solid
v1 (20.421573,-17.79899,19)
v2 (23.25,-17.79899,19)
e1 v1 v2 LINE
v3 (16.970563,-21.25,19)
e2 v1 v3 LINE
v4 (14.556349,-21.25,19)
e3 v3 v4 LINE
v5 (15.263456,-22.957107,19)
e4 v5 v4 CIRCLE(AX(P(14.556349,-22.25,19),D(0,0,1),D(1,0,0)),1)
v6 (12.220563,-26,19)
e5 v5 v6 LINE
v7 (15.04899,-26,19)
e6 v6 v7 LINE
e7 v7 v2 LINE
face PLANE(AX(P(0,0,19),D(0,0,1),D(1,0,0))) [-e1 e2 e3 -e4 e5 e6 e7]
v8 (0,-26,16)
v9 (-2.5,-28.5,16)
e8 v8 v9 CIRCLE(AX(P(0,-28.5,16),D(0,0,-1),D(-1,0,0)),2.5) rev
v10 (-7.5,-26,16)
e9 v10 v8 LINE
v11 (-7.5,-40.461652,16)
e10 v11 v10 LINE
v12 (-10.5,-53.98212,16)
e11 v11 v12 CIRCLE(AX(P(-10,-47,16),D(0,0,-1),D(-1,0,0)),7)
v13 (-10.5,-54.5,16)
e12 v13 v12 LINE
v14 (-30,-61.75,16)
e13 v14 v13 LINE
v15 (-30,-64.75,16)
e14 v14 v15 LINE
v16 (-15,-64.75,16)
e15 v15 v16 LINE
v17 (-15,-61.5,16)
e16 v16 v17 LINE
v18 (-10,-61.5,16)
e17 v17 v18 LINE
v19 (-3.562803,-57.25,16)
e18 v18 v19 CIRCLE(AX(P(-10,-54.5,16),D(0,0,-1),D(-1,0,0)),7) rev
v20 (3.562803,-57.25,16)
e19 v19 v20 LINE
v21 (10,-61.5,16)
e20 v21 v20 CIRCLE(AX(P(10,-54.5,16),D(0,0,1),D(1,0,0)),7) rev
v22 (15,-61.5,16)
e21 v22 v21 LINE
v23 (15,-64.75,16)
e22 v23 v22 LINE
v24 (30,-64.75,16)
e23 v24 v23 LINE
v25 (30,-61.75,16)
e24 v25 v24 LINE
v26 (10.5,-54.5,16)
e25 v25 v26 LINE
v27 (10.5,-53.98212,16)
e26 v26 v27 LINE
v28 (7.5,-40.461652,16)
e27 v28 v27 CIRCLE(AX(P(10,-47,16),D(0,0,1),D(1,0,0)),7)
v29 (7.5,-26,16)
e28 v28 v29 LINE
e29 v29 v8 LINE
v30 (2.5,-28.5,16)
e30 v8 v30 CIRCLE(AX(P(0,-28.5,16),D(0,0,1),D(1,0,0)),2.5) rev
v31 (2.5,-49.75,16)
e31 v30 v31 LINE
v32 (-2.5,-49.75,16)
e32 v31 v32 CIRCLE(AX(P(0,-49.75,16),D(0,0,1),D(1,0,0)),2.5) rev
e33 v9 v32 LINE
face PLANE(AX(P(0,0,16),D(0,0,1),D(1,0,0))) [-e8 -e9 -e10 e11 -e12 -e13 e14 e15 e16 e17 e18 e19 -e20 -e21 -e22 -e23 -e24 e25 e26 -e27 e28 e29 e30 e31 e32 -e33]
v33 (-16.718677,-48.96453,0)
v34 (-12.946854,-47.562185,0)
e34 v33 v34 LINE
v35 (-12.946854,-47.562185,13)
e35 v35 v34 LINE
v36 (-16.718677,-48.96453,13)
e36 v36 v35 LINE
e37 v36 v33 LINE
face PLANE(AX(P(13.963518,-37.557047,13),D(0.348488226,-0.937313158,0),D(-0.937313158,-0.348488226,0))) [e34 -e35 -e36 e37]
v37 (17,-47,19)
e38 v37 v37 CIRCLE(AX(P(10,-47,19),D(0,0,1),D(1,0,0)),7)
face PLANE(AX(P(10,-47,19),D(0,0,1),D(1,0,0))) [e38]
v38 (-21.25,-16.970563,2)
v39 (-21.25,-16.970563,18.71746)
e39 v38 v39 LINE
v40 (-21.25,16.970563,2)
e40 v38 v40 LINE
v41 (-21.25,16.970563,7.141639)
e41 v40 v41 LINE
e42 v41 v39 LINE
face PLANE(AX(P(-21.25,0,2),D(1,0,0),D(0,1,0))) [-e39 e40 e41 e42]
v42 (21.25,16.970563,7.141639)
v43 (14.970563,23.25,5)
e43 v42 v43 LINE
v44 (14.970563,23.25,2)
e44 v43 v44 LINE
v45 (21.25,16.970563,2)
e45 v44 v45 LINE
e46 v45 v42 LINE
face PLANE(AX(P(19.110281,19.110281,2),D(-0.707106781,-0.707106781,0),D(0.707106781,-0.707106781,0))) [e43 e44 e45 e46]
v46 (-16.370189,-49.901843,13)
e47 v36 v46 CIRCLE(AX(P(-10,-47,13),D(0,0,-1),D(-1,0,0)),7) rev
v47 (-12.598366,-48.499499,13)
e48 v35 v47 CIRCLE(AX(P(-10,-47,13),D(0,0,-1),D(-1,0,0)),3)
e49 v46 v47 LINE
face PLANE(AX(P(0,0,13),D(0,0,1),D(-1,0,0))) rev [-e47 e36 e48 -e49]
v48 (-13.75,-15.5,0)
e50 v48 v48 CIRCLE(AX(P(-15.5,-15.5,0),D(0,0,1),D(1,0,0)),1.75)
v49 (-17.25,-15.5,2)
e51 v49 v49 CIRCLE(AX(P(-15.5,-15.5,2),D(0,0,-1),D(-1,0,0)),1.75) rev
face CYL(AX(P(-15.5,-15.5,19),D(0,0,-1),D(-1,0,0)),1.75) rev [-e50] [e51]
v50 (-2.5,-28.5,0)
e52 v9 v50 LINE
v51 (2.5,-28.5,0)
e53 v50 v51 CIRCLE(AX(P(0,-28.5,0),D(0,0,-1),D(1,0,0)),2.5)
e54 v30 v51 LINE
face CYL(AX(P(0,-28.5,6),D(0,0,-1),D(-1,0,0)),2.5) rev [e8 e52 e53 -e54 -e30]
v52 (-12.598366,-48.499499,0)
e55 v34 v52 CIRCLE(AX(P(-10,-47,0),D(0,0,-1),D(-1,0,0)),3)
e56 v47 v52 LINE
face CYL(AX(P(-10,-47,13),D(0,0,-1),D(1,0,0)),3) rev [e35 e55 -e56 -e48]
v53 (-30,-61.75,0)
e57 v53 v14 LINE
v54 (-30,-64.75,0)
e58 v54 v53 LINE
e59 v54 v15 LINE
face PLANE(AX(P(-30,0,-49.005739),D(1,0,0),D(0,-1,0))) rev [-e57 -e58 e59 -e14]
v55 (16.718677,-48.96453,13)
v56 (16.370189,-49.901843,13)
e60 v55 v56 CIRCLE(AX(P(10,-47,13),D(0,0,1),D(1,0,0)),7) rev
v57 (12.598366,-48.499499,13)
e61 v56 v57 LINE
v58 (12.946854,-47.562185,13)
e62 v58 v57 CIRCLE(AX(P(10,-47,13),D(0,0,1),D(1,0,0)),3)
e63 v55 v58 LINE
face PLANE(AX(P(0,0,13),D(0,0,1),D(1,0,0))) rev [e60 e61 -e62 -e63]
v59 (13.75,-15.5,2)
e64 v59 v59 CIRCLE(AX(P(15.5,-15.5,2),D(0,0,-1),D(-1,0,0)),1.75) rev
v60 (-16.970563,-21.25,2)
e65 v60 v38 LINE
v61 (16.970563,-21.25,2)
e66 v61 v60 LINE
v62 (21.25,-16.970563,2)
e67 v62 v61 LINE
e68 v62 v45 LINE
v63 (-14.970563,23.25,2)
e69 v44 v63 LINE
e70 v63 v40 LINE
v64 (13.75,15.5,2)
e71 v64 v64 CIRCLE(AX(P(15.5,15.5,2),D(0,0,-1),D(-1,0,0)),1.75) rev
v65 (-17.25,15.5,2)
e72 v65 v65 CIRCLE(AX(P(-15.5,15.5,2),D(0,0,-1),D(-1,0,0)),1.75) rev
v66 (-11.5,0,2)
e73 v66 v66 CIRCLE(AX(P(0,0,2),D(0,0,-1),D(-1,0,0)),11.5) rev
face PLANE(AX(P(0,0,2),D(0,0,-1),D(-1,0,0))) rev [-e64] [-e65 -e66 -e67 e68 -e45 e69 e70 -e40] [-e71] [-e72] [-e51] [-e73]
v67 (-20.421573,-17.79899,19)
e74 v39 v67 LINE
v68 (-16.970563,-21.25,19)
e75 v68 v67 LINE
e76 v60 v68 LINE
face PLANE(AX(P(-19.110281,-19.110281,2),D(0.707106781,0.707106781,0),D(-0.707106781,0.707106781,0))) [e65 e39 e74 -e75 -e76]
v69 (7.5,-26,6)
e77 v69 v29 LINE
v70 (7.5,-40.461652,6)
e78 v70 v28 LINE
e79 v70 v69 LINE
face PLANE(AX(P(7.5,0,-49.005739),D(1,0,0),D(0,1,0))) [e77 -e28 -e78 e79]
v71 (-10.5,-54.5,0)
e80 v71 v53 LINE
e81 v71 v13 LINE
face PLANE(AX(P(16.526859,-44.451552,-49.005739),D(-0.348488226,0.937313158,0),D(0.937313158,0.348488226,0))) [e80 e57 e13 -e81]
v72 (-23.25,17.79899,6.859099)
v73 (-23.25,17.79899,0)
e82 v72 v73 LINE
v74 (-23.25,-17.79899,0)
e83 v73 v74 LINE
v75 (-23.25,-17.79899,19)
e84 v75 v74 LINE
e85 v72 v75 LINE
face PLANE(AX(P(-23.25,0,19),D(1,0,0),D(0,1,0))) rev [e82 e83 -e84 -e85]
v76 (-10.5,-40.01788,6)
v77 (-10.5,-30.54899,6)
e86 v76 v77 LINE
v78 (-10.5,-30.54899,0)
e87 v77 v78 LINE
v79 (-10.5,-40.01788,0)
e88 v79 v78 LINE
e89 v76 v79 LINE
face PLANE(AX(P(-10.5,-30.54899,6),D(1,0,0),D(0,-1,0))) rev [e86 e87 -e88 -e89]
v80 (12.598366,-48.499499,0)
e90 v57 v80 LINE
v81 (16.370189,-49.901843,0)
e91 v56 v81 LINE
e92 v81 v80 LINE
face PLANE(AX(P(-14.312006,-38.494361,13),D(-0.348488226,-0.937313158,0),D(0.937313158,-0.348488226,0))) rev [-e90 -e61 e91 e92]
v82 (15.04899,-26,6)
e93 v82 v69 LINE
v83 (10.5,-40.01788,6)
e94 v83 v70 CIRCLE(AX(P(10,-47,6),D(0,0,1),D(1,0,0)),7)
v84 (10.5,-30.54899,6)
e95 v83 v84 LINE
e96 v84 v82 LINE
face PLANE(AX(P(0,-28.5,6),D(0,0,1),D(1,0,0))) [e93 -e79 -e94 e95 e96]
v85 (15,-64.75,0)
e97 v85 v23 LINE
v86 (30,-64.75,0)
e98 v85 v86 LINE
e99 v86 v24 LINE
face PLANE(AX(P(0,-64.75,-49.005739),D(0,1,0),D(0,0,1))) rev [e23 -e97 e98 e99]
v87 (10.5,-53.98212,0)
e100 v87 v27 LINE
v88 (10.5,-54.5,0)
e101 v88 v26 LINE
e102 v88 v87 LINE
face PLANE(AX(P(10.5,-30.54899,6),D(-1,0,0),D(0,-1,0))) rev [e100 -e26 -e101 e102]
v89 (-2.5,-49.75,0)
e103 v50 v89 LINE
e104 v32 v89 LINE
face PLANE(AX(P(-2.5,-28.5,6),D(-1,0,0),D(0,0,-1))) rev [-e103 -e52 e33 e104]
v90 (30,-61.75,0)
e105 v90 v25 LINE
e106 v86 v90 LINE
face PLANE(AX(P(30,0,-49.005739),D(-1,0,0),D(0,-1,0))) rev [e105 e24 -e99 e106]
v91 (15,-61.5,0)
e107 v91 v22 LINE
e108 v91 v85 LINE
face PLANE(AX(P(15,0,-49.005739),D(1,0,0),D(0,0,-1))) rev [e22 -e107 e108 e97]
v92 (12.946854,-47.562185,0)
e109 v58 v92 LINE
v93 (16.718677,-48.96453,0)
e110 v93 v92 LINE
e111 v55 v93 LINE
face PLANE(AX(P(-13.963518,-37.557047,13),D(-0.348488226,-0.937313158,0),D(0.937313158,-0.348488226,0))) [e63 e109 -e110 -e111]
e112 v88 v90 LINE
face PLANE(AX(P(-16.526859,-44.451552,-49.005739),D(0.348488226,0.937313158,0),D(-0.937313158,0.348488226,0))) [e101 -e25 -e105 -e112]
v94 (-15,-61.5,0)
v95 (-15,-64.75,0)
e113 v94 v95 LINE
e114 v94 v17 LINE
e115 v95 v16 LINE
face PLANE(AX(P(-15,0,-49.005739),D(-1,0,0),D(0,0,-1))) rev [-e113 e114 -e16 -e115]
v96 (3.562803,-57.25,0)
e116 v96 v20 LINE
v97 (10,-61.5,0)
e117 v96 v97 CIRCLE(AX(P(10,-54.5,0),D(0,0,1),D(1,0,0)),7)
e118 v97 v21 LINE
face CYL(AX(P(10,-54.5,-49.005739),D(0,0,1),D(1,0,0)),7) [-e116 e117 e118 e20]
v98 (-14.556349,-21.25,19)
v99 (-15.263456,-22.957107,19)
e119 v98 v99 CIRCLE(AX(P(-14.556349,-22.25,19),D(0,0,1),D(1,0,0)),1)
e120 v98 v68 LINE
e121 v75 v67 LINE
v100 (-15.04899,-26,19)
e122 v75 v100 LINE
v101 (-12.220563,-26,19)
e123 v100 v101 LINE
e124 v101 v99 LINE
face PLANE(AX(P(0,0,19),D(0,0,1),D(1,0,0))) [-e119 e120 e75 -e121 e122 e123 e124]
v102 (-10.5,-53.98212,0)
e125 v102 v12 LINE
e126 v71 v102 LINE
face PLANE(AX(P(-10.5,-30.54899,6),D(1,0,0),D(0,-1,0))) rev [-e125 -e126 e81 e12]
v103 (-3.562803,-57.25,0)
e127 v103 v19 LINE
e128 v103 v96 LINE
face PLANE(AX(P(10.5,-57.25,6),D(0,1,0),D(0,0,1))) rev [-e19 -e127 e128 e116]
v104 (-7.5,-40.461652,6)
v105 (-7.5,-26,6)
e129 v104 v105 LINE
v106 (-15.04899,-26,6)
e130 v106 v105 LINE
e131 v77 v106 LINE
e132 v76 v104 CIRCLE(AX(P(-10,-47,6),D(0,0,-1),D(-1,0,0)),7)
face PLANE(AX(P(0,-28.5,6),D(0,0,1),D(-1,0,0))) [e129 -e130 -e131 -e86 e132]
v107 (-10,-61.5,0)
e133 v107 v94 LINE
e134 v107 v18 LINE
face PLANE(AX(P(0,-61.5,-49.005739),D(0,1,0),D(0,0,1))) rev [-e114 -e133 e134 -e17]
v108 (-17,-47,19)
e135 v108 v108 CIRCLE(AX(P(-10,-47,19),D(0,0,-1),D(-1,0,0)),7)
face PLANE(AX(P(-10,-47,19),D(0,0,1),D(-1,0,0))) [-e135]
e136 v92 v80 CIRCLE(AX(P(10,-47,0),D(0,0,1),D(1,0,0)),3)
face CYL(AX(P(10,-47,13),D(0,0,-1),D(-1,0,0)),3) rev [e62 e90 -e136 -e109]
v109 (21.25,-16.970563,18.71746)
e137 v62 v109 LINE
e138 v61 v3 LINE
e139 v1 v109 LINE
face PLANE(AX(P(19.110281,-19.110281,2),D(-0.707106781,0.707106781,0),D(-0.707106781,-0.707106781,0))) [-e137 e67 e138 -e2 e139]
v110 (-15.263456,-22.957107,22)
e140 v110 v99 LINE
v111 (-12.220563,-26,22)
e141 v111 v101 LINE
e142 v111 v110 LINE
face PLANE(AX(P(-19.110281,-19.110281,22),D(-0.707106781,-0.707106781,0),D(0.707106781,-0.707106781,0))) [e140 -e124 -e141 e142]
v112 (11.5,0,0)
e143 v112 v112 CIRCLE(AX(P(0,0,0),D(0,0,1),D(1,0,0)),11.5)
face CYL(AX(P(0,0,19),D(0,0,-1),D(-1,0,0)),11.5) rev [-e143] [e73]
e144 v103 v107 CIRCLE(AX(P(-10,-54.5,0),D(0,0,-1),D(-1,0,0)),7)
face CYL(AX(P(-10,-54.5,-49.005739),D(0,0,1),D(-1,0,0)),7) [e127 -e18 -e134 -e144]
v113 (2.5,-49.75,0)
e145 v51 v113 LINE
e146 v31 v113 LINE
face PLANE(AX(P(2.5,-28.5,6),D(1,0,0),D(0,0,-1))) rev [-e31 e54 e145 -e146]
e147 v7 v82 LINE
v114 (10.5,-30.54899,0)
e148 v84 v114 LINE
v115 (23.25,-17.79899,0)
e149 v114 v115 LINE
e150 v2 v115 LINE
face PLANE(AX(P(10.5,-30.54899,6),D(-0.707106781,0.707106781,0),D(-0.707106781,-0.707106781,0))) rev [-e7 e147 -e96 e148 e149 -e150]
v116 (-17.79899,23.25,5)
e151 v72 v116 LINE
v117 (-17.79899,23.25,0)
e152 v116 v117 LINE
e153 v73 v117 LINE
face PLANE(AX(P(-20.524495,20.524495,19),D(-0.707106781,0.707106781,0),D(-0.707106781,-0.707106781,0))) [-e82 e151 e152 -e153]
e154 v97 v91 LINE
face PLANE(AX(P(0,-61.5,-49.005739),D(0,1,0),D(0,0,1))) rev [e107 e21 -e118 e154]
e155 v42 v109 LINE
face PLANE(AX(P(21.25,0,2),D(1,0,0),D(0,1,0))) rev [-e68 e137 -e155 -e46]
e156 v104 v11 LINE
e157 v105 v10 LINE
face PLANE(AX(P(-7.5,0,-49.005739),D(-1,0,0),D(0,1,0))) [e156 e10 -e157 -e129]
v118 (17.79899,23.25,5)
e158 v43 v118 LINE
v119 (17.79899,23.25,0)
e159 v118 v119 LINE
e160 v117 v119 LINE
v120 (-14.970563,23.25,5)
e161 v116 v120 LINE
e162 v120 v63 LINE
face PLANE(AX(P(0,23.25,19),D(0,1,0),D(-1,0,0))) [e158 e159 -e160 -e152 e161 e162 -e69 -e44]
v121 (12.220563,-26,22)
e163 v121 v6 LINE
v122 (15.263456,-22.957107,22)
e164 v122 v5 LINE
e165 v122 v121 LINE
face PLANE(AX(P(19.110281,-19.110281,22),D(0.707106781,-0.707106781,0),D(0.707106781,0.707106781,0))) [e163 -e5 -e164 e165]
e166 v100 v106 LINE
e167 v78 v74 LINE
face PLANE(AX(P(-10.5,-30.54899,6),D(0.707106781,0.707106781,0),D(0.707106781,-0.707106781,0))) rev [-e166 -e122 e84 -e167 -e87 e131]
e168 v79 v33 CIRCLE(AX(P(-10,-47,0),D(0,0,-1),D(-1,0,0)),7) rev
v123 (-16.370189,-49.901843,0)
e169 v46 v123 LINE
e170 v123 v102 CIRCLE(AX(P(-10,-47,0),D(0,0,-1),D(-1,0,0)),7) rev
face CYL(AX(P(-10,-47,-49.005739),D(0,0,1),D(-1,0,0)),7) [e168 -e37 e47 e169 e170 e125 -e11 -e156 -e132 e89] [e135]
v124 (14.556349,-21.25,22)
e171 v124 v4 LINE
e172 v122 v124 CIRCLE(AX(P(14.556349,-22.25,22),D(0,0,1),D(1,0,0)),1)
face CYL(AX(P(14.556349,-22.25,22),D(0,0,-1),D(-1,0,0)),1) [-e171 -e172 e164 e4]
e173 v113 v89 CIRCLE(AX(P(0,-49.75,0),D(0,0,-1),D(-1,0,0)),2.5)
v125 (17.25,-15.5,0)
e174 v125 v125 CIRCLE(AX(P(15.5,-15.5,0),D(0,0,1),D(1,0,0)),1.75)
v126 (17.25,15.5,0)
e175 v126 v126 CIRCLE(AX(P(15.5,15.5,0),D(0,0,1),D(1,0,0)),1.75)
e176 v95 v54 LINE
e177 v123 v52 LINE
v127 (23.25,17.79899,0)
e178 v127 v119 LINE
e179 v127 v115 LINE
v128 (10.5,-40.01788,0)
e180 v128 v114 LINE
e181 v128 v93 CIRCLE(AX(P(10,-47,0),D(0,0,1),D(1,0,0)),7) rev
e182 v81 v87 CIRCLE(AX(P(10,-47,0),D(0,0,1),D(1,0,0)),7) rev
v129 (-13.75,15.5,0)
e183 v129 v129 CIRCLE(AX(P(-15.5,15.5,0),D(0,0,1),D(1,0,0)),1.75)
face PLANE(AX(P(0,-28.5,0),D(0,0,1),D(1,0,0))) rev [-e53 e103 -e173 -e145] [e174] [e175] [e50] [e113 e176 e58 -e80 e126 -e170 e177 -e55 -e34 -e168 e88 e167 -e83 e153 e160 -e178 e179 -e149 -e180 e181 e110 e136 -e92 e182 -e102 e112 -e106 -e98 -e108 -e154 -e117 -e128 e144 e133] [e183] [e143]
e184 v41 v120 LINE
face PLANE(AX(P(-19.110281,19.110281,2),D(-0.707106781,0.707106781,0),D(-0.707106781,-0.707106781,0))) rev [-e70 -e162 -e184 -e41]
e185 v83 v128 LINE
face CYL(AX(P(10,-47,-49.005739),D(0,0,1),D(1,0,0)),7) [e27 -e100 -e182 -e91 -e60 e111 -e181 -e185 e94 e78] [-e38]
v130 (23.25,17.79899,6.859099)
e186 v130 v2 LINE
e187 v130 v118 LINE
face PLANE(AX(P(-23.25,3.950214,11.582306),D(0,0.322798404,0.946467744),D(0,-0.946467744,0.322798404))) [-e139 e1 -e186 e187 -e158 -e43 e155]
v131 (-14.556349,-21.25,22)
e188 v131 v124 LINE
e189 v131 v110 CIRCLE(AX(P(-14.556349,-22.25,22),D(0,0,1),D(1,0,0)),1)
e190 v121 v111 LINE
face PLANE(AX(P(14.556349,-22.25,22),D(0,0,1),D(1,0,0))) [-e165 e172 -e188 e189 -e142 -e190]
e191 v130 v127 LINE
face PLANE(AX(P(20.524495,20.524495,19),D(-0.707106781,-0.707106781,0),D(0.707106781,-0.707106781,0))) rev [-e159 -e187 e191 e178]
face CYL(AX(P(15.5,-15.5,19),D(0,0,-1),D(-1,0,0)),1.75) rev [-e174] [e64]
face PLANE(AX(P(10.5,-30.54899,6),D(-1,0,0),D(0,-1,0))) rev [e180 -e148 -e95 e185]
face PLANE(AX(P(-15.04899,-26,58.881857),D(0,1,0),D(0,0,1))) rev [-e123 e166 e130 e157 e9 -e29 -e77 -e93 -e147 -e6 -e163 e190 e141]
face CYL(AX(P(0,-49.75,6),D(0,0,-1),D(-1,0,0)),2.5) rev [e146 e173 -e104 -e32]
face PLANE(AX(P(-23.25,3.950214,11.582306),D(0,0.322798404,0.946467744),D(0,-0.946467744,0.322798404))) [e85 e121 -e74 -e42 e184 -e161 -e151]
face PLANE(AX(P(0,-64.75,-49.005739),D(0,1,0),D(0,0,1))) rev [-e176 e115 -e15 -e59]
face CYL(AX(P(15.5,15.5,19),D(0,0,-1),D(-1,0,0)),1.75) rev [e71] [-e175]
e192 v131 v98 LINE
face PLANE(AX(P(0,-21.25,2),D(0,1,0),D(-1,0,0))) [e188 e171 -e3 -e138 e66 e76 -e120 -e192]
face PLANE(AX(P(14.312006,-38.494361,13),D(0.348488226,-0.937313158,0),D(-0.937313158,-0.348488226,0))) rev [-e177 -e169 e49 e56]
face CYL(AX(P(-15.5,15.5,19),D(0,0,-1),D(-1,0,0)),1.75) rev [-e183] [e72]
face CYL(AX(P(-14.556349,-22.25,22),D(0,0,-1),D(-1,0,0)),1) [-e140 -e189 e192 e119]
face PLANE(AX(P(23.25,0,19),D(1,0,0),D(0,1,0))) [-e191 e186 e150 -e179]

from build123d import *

# Parameters (mm, degrees)
SKETCH3_R               = 11.5
SKETCH3_R_2             = 1.75
BOSS_EXTRUDE1_DEPTH     = 19
CUT_EXTRUDE1_START      = 19
SKETCH3_3_R             = 11.5
SKETCH3_3_R_2           = 1.75
CUT_EXTRUDE1_DEPTH      = 17
SKETCH3_4_R             = 1.75
SKETCH3_4_R_2           = 11.5
CUT_EXTRUDE3_DEPTH      = 38.975320933
CUT_EXTRUDE7_DEPTH      = 38.975320933
CUT_EXTRUDE7_DEPTH_BACK = 38.975320933
CUT_EXTRUDE8_DEPTH      = 38.015199581
BOSS_EXTRUDE4_DEPTH     = 19
BOSS_EXTRUDE5_START     = 19
BOSS_EXTRUDE5_DEPTH     = 3
BOSS_EXTRUDE6_DEPTH     = 6
BOSS_EXTRUDE7_START     = -6
BOSS_EXTRUDE7_DEPTH     = 16
SKETCH14_R              = 7
BOSS_EXTRUDE8_DEPTH     = 3
CUT_EXTRUDE10_DEPTH     = 13


# Read off the part's stored shape, not the designer's step: Boss-Extrude7, Cut-Extrude10
with BuildPart() as part:
    # Sketch3 → Boss-Extrude1 (new body)
    # profile 1 of 7: a face of its own
    with BuildSketch(Plane.XY):
        Polygon((-23.25, 17.798989873), (-17.798989873, 23.25), (17.798989873, 23.25), (23.25, 17.798989873), (23.25, -17.798989873), (17.798989873, -23.25), (-17.798989873, -23.25), (-23.25, -17.798989873), align=None)
        Polygon((21.25, 16.970562748), (16.970562748, 21.25), (-16.970562748, 21.25), (-21.25, 16.970562748), (-21.25, -16.970562748), (-16.970562748, -21.25), (16.970562748, -21.25), (21.25, -16.970562748), align=None, mode=Mode.SUBTRACT)
    # profile 2 of 7: a face of its own
    with BuildSketch(Plane.XY):
        Polygon((21.25, 16.970562748), (21.25, -16.970562748), (16.970562748, -21.25), (-16.970562748, -21.25), (-21.25, -16.970562748), (-21.25, 16.970562748), (-16.970562748, 21.25), (16.970562748, 21.25), align=None)
        Circle(SKETCH3_R, mode=Mode.SUBTRACT)
        with Locations((-15.5, -15.5)):
            Circle(SKETCH3_R_2, mode=Mode.SUBTRACT)
        with Locations((15.5, -15.5)):
            Circle(SKETCH3_R_2, mode=Mode.SUBTRACT)
        with Locations((15.5, 15.5)):
            Circle(SKETCH3_R_2, mode=Mode.SUBTRACT)
        with Locations((-15.5, 15.5)):
            Circle(SKETCH3_R_2, mode=Mode.SUBTRACT)
    # profile 3 of 7: a face of its own
    with BuildSketch(Plane.XY):
        with Locations((-15.5, 15.5)):
            Circle(SKETCH3_R_2)
    # profile 4 of 7: a face of its own
    with BuildSketch(Plane.XY):
        with Locations((15.5, 15.5)):
            Circle(SKETCH3_R_2)
    # profile 5 of 7: a face of its own
    with BuildSketch(Plane.XY):
        with Locations((15.5, -15.5)):
            Circle(SKETCH3_R_2)
    # profile 6 of 7: a face of its own
    with BuildSketch(Plane.XY):
        with Locations((-15.5, -15.5)):
            Circle(SKETCH3_R_2)
    # profile 7 of 7: a face of its own
    with BuildSketch(Plane.XY):
        Circle(SKETCH3_R)
    extrude(amount=BOSS_EXTRUDE1_DEPTH)

    # Sketch3<3> → Cut-Extrude1 (cut)
    with BuildSketch(Plane.XY.offset(CUT_EXTRUDE1_START)):
        Polygon((21.25, 16.970562748), (21.25, -16.970562748), (16.970562748, -21.25), (-16.970562748, -21.25), (-21.25, -16.970562748), (-21.25, 16.970562748), (-16.970562748, 21.25), (16.970562748, 21.25), align=None)
        Circle(SKETCH3_3_R, mode=Mode.SUBTRACT)
        with Locations((-15.5, -15.5)):
            Circle(SKETCH3_3_R_2, mode=Mode.SUBTRACT)
        with Locations((15.5, -15.5)):
            Circle(SKETCH3_3_R_2, mode=Mode.SUBTRACT)
        with Locations((15.5, 15.5)):
            Circle(SKETCH3_3_R_2, mode=Mode.SUBTRACT)
        with Locations((-15.5, 15.5)):
            Circle(SKETCH3_3_R_2, mode=Mode.SUBTRACT)
    extrude(amount=-CUT_EXTRUDE1_DEPTH, mode=Mode.SUBTRACT)

    # Sketch3<4> → Cut-Extrude3 (cut, through all)
    with BuildSketch(Plane.XY):
        with Locations(Location((-15.5, 15.5, 0), (0, 0, 180))):
            Circle(SKETCH3_4_R)
        with Locations(Location((15.5, 15.5, 0), (0, 0, 180))):
            Circle(SKETCH3_4_R)
        with Locations(Location((-15.5, -15.5, 0), (0, 0, 180))):
            Circle(SKETCH3_4_R)
        with Locations(Location((0, 0, 0), (0, 0, 180))):
            Circle(SKETCH3_4_R_2)
        with Locations(Location((15.5, -15.5, 0), (0, 0, 180))):
            Circle(SKETCH3_4_R)
    extrude(amount=CUT_EXTRUDE3_DEPTH, mode=Mode.SUBTRACT)

    # Sketch6 → Cut-Extrude7 (cut, two sides: drawn at the far end of the back side and taken through both)
    with BuildSketch(Plane(origin=(0, 0, 0), x_dir=(0, 0, -1), z_dir=(1, 0, 0)).offset(-CUT_EXTRUDE7_DEPTH_BACK)):
        Polygon((-19, 23.25), (-5, 23.25), (-19, -17.798989873), align=None)
    extrude(amount=CUT_EXTRUDE7_DEPTH + CUT_EXTRUDE7_DEPTH_BACK, mode=Mode.SUBTRACT)

    # Sketch8 → Cut-Extrude8 (cut, through all)
    with BuildSketch(Plane.XY.offset(2)):
        Polygon((-16.970562748, 21.25), (-14.970562748, 23.25), (14.970562748, 23.25), (16.970562748, 21.25), align=None)
    extrude(amount=CUT_EXTRUDE8_DEPTH, mode=Mode.SUBTRACT)

    # Sketch10 → Boss-Extrude4 (add)
    with BuildSketch(Plane.XY):
        Polygon((19.798989873, -21.25), (-19.798989873, -21.25), (-15.048989873, -26), (15.048989873, -26), align=None)
    extrude(amount=BOSS_EXTRUDE4_DEPTH)

    # Sketch11 → Boss-Extrude5 (add)
    with BuildSketch(Plane.XY.offset(BOSS_EXTRUDE5_START)):
        with BuildLine():
            Line((-14.556349186, -21.25), (14.556349186, -21.25))
            ThreePointArc((14.556349186, -21.25), (15.480228719, -21.867316568), (15.263455967, -22.957106781))
            Line((15.263455967, -22.957106781), (12.220562748, -26))
            Line((12.220562748, -26), (-12.220562748, -26))
            Line((-12.220562748, -26), (-15.263455967, -22.957106781))
            ThreePointArc((-15.263455967, -22.957106781), (-15.480228719, -21.867316568), (-14.556349186, -21.25))
        make_face()
    extrude(amount=BOSS_EXTRUDE5_DEPTH)


with BuildPart() as body_2:
    # Sketch12 → Boss-Extrude6 (new body)
    with BuildSketch(Plane.XY):
        with BuildLine():
            Line((2.5, -28.5), (2.5, -49.75))
            ThreePointArc((2.5, -49.75), (1.767766953, -51.517766953), (0, -52.25))
            Line((0, -52.25), (0, -57.25))
            Line((0, -57.25), (10.5, -57.25))
            Line((10.5, -57.25), (10.5, -30.548989873))
            Line((10.5, -30.548989873), (15.048989873, -26))
            Line((15.048989873, -26), (0, -26))
            ThreePointArc((0, -26), (1.767766953, -26.732233047), (2.5, -28.5))
        make_face()
    extrude(amount=BOSS_EXTRUDE6_DEPTH)

    # Boss-Extrude7 outline → Boss-Extrude7 (add)
    with BuildSketch(Plane.XY.offset(6).offset(BOSS_EXTRUDE7_START)):
        with BuildLine():
            Line((30, -61.75), (10.5, -54.5))
            Line((10.5, -54.5), (10.5, -53.982120022))
            ThreePointArc((10.5, -53.982120022), (16.833795921, -45.483677703), (7.5, -40.461651585))
            Line((7.5, -40.461651585), (7.5, -26))
            Line((7.5, -26), (0, -26))
            ThreePointArc((0, -26), (1.767766953, -26.732233047), (2.5, -28.5))
            Line((2.5, -28.5), (2.5, -49.75))
            ThreePointArc((2.5, -49.75), (1.767766953, -51.517766953), (0, -52.25))
            Line((0, -52.25), (0, -57.25))
            Line((0, -57.25), (3.562803405, -57.25))
            ThreePointArc((3.562803405, -57.25), (6.143187845, -60.341660723), (10, -61.5))
            Line((10, -61.5), (15, -61.5))
            Line((15, -61.5), (15, -64.75))
            Line((15, -64.75), (30, -64.75))
            Line((30, -64.75), (30, -61.75))
        make_face()
    extrude(amount=BOSS_EXTRUDE7_DEPTH)

    # Sketch14 → Boss-Extrude8 (add)
    with BuildSketch(Plane.XY.offset(16)):
        with Locations((10, -47)):
            Circle(SKETCH14_R)
    extrude(amount=BOSS_EXTRUDE8_DEPTH)

    # Cut-Extrude10 outline → Cut-Extrude10 (cut)
    with BuildSketch(Plane.XY):
        with BuildLine():
            ThreePointArc((12.946853826, -47.562185494), (7.188060526, -45.95453532), (12.5983656, -48.499498652))
            Line((12.5983656, -48.499498652), (16.370188856, -49.901843196))
            ThreePointArc((16.370188856, -49.901843196), (16.561192108, -49.439417579), (16.718677082, -48.964530038))
            Line((16.718677082, -48.964530038), (12.946853826, -47.562185494))
        make_face()
    extrude(amount=CUT_EXTRUDE10_DEPTH, mode=Mode.SUBTRACT)


with BuildPart() as body_3:
    # Mirror1: mirrored copy
    add(body_2.part.mirror(Plane(origin=(0, 0, 0), x_dir=(0, 0, 1), z_dir=(1, 0, 0))))


with BuildPart() as body_2_1:
    add(body_2.part)

    # Combine1: union body 3, part
    add(body_3.part)
    add(part.part)


solid = body_2_1.part
